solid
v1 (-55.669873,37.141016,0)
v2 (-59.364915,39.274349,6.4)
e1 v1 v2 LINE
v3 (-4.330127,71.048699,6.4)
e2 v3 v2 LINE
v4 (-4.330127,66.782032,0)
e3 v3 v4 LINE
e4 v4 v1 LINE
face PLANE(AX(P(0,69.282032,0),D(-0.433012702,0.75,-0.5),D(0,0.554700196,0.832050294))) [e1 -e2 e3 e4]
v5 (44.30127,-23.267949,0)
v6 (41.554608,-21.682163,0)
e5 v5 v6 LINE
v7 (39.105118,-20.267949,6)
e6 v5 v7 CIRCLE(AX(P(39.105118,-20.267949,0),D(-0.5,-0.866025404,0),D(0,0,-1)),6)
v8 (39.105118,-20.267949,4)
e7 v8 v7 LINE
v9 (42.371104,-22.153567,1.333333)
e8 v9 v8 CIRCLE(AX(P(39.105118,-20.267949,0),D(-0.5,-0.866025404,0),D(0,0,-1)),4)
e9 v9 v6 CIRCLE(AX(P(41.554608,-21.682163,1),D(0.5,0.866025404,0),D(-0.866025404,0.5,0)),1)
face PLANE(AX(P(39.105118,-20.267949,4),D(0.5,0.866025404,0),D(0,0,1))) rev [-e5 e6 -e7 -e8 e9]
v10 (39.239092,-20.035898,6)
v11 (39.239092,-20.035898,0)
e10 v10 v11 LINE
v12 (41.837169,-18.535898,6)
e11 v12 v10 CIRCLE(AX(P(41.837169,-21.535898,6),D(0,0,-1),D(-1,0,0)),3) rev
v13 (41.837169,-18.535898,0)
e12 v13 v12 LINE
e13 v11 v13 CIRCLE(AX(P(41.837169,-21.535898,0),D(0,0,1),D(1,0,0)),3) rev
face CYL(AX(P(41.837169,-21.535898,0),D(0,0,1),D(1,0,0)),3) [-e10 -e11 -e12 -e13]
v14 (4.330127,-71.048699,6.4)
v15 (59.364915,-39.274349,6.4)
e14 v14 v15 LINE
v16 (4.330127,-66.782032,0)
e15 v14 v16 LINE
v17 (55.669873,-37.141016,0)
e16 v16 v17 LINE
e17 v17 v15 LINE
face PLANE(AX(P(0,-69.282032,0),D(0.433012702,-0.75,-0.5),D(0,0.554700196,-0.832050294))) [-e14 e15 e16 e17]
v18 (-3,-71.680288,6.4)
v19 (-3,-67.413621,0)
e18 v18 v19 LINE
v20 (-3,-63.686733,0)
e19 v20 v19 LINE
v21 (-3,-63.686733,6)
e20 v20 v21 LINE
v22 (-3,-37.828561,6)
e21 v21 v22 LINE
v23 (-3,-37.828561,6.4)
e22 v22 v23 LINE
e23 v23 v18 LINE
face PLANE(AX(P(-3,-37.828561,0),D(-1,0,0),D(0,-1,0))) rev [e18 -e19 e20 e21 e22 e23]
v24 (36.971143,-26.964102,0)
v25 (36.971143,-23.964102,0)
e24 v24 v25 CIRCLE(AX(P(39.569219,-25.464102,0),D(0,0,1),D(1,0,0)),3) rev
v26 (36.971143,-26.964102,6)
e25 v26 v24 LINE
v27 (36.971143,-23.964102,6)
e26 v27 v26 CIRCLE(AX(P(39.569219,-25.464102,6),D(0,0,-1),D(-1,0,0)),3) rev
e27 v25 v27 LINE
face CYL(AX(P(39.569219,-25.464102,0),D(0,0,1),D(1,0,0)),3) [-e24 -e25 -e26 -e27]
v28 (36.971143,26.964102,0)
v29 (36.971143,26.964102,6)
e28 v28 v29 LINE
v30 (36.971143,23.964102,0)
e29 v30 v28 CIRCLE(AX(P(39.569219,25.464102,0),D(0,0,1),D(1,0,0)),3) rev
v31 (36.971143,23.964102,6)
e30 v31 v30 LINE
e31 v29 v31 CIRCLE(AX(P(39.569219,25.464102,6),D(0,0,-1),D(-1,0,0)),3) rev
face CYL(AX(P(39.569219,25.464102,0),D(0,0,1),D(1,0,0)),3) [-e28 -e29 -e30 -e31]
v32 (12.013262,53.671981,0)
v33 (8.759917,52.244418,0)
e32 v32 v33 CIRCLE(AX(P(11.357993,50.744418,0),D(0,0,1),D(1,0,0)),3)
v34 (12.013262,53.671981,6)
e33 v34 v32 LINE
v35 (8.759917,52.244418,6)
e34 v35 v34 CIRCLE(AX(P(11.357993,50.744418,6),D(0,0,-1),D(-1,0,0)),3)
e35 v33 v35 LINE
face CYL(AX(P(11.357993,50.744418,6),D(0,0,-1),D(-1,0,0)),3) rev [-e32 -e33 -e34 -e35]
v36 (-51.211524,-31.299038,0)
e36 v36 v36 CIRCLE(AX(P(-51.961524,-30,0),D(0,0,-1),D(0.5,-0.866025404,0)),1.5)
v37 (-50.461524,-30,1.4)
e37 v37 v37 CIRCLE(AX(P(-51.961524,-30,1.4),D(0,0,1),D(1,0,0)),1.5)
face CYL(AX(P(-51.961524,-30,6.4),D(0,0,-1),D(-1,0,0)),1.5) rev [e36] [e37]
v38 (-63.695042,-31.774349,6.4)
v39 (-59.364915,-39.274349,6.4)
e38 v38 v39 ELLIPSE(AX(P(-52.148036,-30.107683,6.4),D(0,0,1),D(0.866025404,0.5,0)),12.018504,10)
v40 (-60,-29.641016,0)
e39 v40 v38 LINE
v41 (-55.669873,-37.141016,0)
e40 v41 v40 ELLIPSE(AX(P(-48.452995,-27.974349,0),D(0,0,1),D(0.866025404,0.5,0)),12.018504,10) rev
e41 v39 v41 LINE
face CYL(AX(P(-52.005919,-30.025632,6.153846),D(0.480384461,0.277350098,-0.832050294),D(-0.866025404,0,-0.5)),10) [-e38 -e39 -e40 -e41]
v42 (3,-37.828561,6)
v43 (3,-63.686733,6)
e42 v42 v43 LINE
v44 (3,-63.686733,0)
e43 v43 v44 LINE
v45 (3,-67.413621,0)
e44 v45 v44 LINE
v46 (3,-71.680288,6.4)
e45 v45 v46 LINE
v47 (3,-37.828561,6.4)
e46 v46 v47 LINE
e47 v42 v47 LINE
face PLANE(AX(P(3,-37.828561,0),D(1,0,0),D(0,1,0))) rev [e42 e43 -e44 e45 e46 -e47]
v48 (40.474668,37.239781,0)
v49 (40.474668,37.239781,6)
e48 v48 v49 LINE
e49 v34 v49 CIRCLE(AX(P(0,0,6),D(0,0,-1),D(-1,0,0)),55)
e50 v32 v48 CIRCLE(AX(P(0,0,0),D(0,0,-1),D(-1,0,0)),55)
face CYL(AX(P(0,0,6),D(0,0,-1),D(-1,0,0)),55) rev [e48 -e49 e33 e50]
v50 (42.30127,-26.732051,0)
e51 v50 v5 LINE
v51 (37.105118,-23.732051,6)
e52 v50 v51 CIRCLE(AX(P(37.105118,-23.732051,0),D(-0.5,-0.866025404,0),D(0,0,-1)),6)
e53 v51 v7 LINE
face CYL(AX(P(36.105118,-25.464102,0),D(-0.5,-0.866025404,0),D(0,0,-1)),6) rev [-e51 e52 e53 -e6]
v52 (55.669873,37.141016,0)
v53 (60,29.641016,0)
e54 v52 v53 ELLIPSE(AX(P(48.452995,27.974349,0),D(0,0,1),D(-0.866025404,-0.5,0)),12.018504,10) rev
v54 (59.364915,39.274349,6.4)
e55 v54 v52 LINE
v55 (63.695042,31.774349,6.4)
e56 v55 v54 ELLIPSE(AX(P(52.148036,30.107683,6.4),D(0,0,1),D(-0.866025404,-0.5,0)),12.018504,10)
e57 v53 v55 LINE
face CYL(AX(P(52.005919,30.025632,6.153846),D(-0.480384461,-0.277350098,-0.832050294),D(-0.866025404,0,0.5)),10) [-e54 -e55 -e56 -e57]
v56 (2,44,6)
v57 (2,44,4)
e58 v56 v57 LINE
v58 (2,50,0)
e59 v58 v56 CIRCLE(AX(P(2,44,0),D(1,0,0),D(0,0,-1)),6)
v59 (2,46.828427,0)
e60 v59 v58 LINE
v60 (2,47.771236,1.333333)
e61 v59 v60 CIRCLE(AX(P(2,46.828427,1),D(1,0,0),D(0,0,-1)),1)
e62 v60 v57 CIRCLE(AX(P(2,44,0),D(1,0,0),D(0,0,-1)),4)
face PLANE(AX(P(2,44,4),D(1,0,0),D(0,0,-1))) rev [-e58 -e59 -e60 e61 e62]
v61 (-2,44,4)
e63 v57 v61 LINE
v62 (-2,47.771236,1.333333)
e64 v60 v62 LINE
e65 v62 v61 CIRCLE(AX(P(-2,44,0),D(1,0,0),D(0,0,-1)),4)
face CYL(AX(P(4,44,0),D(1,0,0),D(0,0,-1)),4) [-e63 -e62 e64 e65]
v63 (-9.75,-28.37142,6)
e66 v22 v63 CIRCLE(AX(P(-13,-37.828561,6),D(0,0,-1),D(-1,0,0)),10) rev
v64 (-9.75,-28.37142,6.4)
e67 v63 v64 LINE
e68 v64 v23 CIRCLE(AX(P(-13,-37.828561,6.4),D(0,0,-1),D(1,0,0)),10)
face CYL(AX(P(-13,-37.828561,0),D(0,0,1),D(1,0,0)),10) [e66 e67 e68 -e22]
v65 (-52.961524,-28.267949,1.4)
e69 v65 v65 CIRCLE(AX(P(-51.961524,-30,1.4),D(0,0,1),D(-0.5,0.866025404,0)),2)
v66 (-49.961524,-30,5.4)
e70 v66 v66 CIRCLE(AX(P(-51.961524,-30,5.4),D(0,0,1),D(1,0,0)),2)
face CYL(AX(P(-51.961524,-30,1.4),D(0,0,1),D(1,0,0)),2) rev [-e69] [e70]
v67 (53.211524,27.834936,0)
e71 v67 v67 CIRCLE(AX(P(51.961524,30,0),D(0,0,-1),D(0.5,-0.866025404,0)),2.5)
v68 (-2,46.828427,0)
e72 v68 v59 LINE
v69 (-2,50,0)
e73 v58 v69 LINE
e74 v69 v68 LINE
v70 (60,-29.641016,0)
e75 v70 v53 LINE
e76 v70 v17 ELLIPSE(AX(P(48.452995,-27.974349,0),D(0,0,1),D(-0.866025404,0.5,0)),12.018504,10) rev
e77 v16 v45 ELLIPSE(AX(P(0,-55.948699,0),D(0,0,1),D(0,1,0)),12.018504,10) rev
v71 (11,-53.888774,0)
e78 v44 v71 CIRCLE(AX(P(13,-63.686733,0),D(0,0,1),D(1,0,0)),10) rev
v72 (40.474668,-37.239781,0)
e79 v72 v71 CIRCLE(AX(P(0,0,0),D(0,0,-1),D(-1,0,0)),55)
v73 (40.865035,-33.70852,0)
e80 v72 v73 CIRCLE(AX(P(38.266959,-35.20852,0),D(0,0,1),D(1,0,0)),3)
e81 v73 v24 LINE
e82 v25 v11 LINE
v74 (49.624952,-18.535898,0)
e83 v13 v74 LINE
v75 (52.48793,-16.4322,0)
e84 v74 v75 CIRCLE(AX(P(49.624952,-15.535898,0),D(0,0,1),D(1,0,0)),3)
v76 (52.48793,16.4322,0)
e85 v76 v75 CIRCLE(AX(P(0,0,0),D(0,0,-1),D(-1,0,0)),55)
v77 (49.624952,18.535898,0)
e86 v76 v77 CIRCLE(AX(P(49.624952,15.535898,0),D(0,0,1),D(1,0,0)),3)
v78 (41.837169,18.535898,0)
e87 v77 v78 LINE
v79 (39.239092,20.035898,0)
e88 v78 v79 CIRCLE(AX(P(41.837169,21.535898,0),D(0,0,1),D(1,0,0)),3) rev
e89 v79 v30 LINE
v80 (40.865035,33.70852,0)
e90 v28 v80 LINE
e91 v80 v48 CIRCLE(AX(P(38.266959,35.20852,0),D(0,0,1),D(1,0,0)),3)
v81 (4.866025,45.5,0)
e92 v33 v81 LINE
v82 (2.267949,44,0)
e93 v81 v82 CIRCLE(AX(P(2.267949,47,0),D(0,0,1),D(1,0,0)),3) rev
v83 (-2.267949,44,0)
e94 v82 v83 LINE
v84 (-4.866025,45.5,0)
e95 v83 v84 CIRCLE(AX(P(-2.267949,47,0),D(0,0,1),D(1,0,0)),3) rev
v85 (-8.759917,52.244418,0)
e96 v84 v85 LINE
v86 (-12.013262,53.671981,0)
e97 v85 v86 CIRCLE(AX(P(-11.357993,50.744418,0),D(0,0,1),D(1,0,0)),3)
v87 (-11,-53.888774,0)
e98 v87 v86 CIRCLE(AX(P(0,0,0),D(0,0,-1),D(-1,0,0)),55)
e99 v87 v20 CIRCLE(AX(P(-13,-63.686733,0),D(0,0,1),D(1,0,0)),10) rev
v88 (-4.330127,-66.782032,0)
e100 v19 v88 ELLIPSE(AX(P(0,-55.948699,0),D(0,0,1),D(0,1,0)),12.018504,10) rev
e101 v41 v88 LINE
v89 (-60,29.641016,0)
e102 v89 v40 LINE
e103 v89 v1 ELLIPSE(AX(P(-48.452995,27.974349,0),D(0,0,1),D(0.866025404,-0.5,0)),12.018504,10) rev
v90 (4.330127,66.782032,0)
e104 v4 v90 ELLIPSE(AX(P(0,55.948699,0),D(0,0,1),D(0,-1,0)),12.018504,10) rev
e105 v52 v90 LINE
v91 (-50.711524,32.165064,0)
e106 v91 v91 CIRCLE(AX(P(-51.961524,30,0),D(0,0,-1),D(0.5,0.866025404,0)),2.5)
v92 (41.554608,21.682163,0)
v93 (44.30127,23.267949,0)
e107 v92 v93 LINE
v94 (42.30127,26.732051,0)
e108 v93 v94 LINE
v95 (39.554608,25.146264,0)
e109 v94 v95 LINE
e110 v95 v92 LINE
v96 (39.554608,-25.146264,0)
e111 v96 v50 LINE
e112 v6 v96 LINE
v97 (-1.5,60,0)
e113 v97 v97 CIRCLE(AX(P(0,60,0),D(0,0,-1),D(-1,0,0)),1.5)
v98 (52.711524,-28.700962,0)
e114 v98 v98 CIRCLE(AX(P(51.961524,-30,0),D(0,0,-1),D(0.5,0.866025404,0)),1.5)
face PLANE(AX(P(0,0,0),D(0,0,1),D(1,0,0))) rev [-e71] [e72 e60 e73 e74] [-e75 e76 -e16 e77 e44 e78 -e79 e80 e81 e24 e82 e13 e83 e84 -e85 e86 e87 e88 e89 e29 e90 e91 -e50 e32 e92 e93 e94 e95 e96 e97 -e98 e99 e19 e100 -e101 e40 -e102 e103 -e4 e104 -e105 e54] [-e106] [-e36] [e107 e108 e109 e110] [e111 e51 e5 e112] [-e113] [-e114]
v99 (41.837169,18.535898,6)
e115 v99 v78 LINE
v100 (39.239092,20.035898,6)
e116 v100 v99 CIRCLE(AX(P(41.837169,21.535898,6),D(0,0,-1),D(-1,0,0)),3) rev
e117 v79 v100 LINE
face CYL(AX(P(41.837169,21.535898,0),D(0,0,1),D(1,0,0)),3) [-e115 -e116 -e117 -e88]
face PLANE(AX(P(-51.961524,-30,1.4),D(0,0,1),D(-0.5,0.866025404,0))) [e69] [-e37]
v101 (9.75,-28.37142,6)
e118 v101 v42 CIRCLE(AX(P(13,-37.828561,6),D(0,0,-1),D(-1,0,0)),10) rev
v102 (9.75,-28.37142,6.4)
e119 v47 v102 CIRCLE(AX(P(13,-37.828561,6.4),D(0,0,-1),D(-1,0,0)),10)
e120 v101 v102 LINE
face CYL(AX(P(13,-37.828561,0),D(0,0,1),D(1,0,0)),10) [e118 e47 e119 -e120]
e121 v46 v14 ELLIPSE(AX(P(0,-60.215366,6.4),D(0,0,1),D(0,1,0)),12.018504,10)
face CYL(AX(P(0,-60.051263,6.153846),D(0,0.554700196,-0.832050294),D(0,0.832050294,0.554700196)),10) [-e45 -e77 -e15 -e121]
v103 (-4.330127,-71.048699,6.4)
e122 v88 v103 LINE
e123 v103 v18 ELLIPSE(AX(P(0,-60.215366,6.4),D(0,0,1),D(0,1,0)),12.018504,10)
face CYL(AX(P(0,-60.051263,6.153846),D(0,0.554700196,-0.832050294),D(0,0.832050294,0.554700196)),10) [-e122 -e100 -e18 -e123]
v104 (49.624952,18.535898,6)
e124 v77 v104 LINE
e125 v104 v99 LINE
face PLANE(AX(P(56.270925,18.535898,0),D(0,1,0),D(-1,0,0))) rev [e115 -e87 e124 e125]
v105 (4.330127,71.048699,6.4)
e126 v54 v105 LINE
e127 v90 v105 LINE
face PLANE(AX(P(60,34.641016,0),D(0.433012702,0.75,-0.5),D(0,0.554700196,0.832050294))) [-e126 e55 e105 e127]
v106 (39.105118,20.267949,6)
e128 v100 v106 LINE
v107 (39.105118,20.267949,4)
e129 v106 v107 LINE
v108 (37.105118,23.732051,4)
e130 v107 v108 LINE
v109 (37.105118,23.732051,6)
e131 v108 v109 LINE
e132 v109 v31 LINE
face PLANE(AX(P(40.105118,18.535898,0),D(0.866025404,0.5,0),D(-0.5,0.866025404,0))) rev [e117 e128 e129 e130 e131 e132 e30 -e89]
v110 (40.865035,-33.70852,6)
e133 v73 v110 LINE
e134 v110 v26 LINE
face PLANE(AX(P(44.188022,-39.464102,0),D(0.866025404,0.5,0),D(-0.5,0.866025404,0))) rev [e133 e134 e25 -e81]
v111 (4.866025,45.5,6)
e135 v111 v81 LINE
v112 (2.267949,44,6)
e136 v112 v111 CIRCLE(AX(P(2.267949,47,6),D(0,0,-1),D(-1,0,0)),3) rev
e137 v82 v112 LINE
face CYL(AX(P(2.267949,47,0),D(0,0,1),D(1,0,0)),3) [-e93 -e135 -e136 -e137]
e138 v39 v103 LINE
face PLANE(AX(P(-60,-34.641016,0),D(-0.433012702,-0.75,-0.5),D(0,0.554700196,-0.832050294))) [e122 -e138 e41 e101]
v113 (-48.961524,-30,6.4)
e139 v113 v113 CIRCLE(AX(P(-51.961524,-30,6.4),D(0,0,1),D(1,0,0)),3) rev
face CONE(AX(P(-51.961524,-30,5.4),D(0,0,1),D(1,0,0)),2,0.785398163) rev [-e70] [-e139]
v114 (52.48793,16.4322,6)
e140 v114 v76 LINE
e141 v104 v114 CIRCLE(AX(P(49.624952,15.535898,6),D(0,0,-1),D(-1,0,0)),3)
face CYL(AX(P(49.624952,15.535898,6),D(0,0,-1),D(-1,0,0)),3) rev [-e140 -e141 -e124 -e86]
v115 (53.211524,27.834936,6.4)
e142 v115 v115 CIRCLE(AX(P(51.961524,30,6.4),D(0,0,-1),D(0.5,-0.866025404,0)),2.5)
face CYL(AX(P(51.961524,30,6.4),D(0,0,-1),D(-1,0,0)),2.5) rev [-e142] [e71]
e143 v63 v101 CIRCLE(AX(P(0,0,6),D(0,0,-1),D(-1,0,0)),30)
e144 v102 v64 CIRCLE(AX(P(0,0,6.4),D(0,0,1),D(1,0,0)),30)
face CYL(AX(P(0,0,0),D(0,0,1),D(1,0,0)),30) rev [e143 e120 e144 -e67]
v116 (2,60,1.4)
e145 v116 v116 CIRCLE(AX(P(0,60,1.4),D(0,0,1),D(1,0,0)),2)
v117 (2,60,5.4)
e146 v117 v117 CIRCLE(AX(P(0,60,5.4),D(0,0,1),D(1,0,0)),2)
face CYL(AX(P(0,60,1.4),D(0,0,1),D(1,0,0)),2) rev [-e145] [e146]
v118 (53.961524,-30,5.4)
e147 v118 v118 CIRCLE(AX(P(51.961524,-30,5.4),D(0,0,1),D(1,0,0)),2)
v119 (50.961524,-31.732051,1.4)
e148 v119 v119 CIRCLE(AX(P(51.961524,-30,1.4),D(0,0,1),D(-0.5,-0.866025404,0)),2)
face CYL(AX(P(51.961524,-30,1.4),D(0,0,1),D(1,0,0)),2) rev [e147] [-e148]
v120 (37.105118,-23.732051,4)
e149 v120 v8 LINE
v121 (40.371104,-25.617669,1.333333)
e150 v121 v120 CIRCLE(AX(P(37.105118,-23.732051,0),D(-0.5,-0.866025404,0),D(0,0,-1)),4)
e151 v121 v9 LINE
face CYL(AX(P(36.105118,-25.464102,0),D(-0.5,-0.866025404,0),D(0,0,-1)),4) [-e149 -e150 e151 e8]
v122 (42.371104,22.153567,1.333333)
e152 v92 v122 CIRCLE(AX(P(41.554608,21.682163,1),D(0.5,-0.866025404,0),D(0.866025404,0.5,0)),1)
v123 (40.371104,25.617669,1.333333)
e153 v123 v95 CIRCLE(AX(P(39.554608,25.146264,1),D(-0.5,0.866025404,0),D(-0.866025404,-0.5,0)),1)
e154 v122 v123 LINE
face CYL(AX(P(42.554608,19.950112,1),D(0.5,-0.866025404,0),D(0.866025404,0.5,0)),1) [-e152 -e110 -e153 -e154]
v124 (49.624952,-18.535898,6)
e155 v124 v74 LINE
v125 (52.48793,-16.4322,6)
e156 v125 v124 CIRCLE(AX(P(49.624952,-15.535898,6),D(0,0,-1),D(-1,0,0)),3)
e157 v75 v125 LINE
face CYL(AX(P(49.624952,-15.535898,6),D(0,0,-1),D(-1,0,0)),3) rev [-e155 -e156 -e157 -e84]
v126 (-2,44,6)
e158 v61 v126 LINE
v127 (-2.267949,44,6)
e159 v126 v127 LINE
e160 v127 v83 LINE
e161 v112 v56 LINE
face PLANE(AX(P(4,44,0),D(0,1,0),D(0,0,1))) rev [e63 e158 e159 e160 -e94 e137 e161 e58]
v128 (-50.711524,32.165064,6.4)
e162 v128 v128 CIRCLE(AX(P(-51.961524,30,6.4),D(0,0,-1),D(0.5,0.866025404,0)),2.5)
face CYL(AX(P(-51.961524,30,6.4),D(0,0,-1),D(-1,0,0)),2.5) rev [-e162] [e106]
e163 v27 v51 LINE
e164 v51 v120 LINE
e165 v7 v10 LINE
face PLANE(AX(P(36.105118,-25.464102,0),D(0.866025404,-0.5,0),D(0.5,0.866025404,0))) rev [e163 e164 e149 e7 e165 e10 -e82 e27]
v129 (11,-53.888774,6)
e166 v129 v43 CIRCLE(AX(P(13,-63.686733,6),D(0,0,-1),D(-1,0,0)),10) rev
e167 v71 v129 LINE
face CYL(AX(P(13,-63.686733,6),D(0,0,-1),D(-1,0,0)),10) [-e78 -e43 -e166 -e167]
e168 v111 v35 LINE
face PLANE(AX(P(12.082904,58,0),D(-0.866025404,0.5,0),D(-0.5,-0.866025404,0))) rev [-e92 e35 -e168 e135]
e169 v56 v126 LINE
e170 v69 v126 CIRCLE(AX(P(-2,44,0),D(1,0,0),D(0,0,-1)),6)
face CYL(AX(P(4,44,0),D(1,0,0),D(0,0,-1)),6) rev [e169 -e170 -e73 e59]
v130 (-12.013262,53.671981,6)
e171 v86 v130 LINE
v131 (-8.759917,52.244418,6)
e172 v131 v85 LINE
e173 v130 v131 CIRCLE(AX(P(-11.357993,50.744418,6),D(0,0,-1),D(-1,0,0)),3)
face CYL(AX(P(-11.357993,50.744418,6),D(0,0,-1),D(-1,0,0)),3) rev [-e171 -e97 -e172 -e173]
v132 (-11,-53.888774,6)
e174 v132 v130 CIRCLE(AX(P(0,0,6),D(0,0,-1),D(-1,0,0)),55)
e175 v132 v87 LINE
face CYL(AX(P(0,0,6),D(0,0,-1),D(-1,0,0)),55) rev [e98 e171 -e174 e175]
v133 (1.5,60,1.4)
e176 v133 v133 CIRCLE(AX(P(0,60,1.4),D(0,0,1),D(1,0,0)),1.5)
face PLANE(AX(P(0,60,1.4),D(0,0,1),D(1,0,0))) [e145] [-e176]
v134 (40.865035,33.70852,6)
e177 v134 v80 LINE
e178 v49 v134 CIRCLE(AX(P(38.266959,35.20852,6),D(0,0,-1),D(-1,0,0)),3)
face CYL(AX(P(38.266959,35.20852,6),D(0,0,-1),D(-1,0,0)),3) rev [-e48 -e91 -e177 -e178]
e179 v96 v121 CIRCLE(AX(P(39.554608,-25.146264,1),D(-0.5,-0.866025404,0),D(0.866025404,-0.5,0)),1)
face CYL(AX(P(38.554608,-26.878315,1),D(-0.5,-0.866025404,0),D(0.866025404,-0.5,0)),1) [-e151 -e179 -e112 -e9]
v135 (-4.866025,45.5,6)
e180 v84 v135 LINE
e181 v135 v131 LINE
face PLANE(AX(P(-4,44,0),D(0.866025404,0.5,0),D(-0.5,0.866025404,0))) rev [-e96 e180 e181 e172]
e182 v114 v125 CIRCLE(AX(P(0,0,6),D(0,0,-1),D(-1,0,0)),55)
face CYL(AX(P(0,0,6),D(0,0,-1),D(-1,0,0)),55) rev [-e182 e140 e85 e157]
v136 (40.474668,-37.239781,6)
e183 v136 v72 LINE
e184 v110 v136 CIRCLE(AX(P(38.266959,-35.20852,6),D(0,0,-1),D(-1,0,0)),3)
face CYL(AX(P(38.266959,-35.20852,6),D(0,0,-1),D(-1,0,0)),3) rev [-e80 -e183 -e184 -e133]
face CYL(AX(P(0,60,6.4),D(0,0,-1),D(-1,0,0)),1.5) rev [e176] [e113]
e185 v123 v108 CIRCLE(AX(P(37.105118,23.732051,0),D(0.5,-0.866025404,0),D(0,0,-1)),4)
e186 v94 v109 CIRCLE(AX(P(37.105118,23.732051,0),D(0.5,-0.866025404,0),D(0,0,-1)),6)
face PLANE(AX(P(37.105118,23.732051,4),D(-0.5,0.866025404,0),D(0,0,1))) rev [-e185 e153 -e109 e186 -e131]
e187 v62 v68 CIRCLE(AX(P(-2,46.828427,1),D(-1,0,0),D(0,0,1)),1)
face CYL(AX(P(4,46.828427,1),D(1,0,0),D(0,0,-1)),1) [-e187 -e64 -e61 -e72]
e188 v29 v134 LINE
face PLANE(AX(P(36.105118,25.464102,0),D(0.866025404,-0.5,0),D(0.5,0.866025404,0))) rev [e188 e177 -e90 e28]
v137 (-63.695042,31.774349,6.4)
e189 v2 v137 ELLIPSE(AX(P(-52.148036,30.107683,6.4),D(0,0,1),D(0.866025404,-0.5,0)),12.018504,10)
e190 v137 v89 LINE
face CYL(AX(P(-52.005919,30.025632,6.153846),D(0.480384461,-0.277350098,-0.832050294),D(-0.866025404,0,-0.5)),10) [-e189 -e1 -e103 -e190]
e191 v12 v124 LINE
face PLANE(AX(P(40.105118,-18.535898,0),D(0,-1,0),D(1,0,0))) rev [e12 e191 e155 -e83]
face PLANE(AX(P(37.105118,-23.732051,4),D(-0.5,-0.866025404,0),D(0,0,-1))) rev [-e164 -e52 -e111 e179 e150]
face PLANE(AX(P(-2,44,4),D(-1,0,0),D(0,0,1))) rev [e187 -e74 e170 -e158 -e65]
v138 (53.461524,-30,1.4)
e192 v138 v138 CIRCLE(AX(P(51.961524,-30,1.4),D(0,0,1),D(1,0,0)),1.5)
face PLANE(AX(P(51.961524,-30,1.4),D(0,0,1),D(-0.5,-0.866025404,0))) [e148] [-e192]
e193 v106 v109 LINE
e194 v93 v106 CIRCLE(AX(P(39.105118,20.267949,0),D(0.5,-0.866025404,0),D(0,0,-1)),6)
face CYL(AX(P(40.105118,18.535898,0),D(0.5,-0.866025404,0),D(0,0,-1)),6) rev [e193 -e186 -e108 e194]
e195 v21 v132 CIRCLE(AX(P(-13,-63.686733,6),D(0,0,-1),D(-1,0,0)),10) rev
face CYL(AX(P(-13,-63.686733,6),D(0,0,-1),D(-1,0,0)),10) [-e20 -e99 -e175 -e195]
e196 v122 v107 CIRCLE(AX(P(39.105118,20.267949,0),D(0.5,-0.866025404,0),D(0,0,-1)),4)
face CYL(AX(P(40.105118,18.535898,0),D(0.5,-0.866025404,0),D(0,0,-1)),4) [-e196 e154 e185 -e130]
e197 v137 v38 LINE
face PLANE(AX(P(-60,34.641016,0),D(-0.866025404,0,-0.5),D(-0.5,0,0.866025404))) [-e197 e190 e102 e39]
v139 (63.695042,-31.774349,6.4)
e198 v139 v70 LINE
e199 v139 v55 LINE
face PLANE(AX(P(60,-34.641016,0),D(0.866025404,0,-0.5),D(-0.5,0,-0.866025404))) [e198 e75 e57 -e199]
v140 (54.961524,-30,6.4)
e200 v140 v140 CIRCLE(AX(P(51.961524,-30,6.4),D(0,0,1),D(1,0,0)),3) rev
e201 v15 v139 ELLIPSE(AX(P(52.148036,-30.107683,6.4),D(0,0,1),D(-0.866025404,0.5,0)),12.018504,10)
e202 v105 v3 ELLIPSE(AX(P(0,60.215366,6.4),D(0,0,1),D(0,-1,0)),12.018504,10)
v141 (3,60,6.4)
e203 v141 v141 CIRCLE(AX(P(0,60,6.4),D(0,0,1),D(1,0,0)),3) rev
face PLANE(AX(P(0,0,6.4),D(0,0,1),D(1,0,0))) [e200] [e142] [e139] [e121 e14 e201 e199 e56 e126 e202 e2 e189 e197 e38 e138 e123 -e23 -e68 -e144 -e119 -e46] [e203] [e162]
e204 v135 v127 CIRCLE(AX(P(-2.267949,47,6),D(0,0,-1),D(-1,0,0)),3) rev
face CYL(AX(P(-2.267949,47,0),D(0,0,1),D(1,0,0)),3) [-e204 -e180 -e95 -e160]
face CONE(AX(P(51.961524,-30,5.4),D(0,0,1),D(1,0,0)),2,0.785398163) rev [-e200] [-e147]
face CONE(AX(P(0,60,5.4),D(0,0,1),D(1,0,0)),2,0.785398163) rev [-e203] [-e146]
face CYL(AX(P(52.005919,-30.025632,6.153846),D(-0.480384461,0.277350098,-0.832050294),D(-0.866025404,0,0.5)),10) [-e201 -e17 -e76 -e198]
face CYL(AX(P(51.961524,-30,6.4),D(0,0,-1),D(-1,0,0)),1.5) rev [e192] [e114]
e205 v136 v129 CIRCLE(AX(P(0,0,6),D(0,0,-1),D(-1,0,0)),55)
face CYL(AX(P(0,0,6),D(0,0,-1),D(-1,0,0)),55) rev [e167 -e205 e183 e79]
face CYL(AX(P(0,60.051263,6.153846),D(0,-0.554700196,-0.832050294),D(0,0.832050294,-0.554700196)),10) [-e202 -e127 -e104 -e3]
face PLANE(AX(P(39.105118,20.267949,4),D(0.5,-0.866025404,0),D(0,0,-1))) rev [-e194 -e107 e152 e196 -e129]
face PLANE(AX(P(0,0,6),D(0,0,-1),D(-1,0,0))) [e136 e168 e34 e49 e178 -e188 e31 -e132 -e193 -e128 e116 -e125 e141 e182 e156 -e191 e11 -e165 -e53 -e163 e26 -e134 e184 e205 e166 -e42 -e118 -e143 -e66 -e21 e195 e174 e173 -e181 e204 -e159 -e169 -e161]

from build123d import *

# Parameters (mm, degrees)
BOSS_EXTRUDE1_DEPTH       = 6.4
BOSS_EXTRUDE1_DRAFT       = -30
FILLET1_R                 = 10
SKETCH13_R                = 2
CUT_EXTRUDE3_DEPTH        = 5
SKETCH14_R                = 1.5
CUT_EXTRUDE4_DEPTH        = 97.51813456
SKETCH15_R                = 55
CUT_EXTRUDE5_DEPTH        = 6
CIRPATTERN9_COUNT         = 3
BOSS_EXTRUDE4_DEPTH       = 6
SKETCH21_W                = 4
SKETCH21_H                = 2
FILLET8_R                 = 1
CIRPATTERN11_COUNT        = 3
CIRPATTERN11_ANGLE        = 120
FILLET8_OF_CIRPATTERN11_R = 1
SKETCH16_R                = 2.5
CUT_EXTRUDE6_DEPTH        = 97.51813456
CIRPATTERN10_COUNT        = 3
CUT_EXTRUDE7_DEPTH        = 97.51813456
FILLET9_R                 = 10
FILLET10_R                = 3
CHAMFER2_SIZE             = 1


with BuildPart() as part:
    # Sketch1 → Boss-Extrude1 (with draft: the straight prism first)
    with BuildSketch(Plane.XY):
        Polygon((0, 69.282032303), (-60, 34.641016151), (-60, -34.641016151), (0, -69.282032303), (60, -34.641016151), (60, 34.641016151), align=None)
    extrude(amount=BOSS_EXTRUDE1_DEPTH)
    # Boss-Extrude1: the draft: its side faces are tilted about the plane it starts from
    boss_extrude1_sides = [part.faces().sort_by_distance(p)[0] for p in [
        (-30, 51.961524227, 3.2),
        (-60, 0, 3.2),
        (-30, -51.961524227, 3.2),
        (30, -51.961524227, 3.2),
        (60, 0, 3.2),
        (30, 51.961524227, 3.2),
    ]]
    draft(boss_extrude1_sides, Plane.XY, BOSS_EXTRUDE1_DRAFT)

    # Fillet1
    fillet1_edges = [part.edges().sort_by_distance(p)[0] for p in [
        (61.847520861, 35.707682818, 3.2),
        (61.847520861, -35.707682818, 3.2),
        (0, -71.415365636, 3.2),
        (-61.847520861, -35.707682818, 3.2),
        (-61.847520861, 35.707682818, 3.2),
        (0, 71.415365636, 3.2),
    ]]
    fillet(fillet1_edges, radius=FILLET1_R)

    # Sketch13 → Cut-Extrude3 (cut)
    with BuildSketch(Plane.XY.offset(6.4)):
        with Locations((0, 60)):
            Circle(SKETCH13_R)
    cut_extrude3 = extrude(amount=-CUT_EXTRUDE3_DEPTH, mode=Mode.SUBTRACT)

    # Sketch14 → Cut-Extrude4 (cut, through all)
    with BuildSketch(Plane(origin=(0, 0, 0), x_dir=(-1, 0, 0), z_dir=(0, 0, -1))):
        with Locations((0, 60)):
            Circle(SKETCH14_R)
    cut_extrude4 = extrude(amount=-CUT_EXTRUDE4_DEPTH, mode=Mode.SUBTRACT)

    # Sketch15 → Cut-Extrude5 (cut)
    with BuildSketch(Plane(origin=(0, 0, 0), x_dir=(-1, 0, 0), z_dir=(0, 0, -1))):
        Circle(SKETCH15_R)
    extrude(amount=-CUT_EXTRUDE5_DEPTH, mode=Mode.SUBTRACT)

    # CirPattern9: Cut-Extrude3, Cut-Extrude4 ×3 about axis
    cirpattern9_axis = Axis((0, 0, 0), (0, 0, 1))
    add([cut_extrude3.rotate(cirpattern9_axis, i * 360 / CIRPATTERN9_COUNT) for i in range(1, CIRPATTERN9_COUNT)], mode=Mode.SUBTRACT)
    add([cut_extrude4.rotate(cirpattern9_axis, i * 360 / CIRPATTERN9_COUNT) for i in range(1, CIRPATTERN9_COUNT)], mode=Mode.SUBTRACT)

    # Sketch20 → Boss-Extrude4 (add)
    with BuildSketch(Plane(origin=(0, 0, 6), x_dir=(-1, 0, 0), z_dir=(0, 0, -1))):
        Polygon((-12.082903769, 58), (-4, 44), (4, 44), (12.082903769, 58), align=None)
    boss_extrude4 = extrude(amount=BOSS_EXTRUDE4_DEPTH)

    # Sketch21 → Cut-Revolve1 (revolve, cut)
    with BuildSketch(Plane(origin=(0, 44, 0), x_dir=(-1, 0, 0), z_dir=(0, -1, 0))):
        with Locations((0, -5)):
            Rectangle(SKETCH21_W, SKETCH21_H)
    cut_revolve1 = revolve(axis=Axis((4, 44, 0), (1, 0, 0)), mode=Mode.SUBTRACT)

    # Fillet8
    fillet8_edges = [part.edges().sort_by_distance(p)[0] for p in [
        (0, 48, 0),
    ]]
    fillet(fillet8_edges, radius=FILLET8_R)

    # CirPattern11: Boss-Extrude4, Cut-Revolve1 ×3 about axis
    cirpattern11_axis = Axis((0, 0, 0), (0, 0, -1))
    add([boss_extrude4.rotate(cirpattern11_axis, i * CIRPATTERN11_ANGLE / (CIRPATTERN11_COUNT - 1)) for i in range(1, CIRPATTERN11_COUNT)])
    add([cut_revolve1.rotate(cirpattern11_axis, i * CIRPATTERN11_ANGLE / (CIRPATTERN11_COUNT - 1)) for i in range(1, CIRPATTERN11_COUNT)], mode=Mode.SUBTRACT)

    # Fillet8 of CirPattern11
    fillet8_of_cirpattern11_edges = [part.edges().sort_by_distance(p)[0] for p in [
        (41.569219382, 24, 0),
        (41.569219382, -24, 0),
    ]]
    fillet(fillet8_of_cirpattern11_edges, radius=FILLET8_OF_CIRPATTERN11_R)

    # Sketch16 → Cut-Extrude6 (cut, through all)
    with BuildSketch(Plane(origin=(0, 0, 0), x_dir=(-1, 0, 0), z_dir=(0, 0, -1))):
        with Locations((0, -60)):
            Circle(SKETCH16_R)
    cut_extrude6 = extrude(amount=-CUT_EXTRUDE6_DEPTH, mode=Mode.SUBTRACT)

    # CirPattern10: Cut-Extrude6 ×3 about axis
    cirpattern10_axis = Axis((0, 0, 0), (0, 0, 1))
    for i in range(1, CIRPATTERN10_COUNT):
        add(cut_extrude6.rotate(cirpattern10_axis, i * 360 / CIRPATTERN10_COUNT), mode=Mode.SUBTRACT)

    # Sketch22 → Cut-Extrude7 (cut, through all)
    with BuildSketch(Plane.XY.offset(6.4)):
        with BuildLine():
            Line((-3, -37.828560639), (-3, -80))
            Line((-3, -80), (3, -80))
            Line((3, -80), (3, -37.828560639))
            ThreePointArc((3, -37.828560639), (4.860589702, -32.019085619), (9.75, -28.371420479))
            ThreePointArc((9.75, -28.371420479), (0, 30), (-9.75, -28.371420479))
            ThreePointArc((-9.75, -28.371420479), (-4.860589702, -32.019085619), (-3, -37.828560639))
        make_face()
    extrude(amount=-CUT_EXTRUDE7_DEPTH, mode=Mode.SUBTRACT)

    # Fillet9
    fillet9_edges = [part.edges().sort_by_distance(p)[0] for p in [
        (3, -54.918120871, 3),
        (-3, -54.918120871, 3),
    ]]
    fillet(fillet9_edges, radius=FILLET9_R)

    # Fillet10
    fillet10_edges = [part.edges().sort_by_distance(p)[0] for p in [
        (51.782434001, 18.535898385, 3),
        (41.943775884, 35.576954122, 3),
        (36.105117767, 25.464101615, 3),
        (40.105117767, 18.535898385, 3),
        (41.943775884, -35.576954122, 3),
        (51.782434001, -18.535898385, 3),
        (40.105117767, -18.535898385, 3),
        (36.105117767, -25.464101615, 3),
        (9.838658117, 54.112852507, 3),
        (-9.838658117, 54.112852507, 3),
        (-4, 44, 3),
        (4, 44, 3),
    ]]
    fillet(fillet10_edges, radius=FILLET10_R)

    # Chamfer2
    # the kernel refuses this chamfer: 1 mm, written as the material it takes off along each edge
    with BuildSketch(Plane(origin=(0, 60, 6.4), x_dir=(1, 0, 0), z_dir=(0, -1, 0))) as chamfer2_piece_1:
        Polygon((2 + CHAMFER2_SIZE, 0), (2, -CHAMFER2_SIZE), (2, 0), align=None)
    revolve(axis=Axis((0, 60, 6.4), (0, 0, 1)), mode=Mode.SUBTRACT)
    with BuildSketch(Plane(origin=(51.961524227, -30, 6.4), x_dir=(-0.4999999999999998, -0.8660254037844389, 0), z_dir=(-0.8660254037844389, 0.4999999999999998, 0))) as chamfer2_piece_2:
        Polygon((2 + CHAMFER2_SIZE, 0), (2, -CHAMFER2_SIZE), (2, 0), align=None)
    revolve(axis=Axis((51.961524227, -30, 6.4), (0, 0, 1)), mode=Mode.SUBTRACT)
    with BuildSketch(Plane(origin=(-51.961524227, -30, 6.4), x_dir=(-0.4999999999999998, 0.8660254037844389, 0), z_dir=(0.8660254037844389, 0.4999999999999998, 0))) as chamfer2_piece_3:
        Polygon((2 + CHAMFER2_SIZE, 0), (2, -CHAMFER2_SIZE), (2, 0), align=None)
    revolve(axis=Axis((-51.961524227, -30, 6.4), (0, 0, 1)), mode=Mode.SUBTRACT)


solid = part.part
